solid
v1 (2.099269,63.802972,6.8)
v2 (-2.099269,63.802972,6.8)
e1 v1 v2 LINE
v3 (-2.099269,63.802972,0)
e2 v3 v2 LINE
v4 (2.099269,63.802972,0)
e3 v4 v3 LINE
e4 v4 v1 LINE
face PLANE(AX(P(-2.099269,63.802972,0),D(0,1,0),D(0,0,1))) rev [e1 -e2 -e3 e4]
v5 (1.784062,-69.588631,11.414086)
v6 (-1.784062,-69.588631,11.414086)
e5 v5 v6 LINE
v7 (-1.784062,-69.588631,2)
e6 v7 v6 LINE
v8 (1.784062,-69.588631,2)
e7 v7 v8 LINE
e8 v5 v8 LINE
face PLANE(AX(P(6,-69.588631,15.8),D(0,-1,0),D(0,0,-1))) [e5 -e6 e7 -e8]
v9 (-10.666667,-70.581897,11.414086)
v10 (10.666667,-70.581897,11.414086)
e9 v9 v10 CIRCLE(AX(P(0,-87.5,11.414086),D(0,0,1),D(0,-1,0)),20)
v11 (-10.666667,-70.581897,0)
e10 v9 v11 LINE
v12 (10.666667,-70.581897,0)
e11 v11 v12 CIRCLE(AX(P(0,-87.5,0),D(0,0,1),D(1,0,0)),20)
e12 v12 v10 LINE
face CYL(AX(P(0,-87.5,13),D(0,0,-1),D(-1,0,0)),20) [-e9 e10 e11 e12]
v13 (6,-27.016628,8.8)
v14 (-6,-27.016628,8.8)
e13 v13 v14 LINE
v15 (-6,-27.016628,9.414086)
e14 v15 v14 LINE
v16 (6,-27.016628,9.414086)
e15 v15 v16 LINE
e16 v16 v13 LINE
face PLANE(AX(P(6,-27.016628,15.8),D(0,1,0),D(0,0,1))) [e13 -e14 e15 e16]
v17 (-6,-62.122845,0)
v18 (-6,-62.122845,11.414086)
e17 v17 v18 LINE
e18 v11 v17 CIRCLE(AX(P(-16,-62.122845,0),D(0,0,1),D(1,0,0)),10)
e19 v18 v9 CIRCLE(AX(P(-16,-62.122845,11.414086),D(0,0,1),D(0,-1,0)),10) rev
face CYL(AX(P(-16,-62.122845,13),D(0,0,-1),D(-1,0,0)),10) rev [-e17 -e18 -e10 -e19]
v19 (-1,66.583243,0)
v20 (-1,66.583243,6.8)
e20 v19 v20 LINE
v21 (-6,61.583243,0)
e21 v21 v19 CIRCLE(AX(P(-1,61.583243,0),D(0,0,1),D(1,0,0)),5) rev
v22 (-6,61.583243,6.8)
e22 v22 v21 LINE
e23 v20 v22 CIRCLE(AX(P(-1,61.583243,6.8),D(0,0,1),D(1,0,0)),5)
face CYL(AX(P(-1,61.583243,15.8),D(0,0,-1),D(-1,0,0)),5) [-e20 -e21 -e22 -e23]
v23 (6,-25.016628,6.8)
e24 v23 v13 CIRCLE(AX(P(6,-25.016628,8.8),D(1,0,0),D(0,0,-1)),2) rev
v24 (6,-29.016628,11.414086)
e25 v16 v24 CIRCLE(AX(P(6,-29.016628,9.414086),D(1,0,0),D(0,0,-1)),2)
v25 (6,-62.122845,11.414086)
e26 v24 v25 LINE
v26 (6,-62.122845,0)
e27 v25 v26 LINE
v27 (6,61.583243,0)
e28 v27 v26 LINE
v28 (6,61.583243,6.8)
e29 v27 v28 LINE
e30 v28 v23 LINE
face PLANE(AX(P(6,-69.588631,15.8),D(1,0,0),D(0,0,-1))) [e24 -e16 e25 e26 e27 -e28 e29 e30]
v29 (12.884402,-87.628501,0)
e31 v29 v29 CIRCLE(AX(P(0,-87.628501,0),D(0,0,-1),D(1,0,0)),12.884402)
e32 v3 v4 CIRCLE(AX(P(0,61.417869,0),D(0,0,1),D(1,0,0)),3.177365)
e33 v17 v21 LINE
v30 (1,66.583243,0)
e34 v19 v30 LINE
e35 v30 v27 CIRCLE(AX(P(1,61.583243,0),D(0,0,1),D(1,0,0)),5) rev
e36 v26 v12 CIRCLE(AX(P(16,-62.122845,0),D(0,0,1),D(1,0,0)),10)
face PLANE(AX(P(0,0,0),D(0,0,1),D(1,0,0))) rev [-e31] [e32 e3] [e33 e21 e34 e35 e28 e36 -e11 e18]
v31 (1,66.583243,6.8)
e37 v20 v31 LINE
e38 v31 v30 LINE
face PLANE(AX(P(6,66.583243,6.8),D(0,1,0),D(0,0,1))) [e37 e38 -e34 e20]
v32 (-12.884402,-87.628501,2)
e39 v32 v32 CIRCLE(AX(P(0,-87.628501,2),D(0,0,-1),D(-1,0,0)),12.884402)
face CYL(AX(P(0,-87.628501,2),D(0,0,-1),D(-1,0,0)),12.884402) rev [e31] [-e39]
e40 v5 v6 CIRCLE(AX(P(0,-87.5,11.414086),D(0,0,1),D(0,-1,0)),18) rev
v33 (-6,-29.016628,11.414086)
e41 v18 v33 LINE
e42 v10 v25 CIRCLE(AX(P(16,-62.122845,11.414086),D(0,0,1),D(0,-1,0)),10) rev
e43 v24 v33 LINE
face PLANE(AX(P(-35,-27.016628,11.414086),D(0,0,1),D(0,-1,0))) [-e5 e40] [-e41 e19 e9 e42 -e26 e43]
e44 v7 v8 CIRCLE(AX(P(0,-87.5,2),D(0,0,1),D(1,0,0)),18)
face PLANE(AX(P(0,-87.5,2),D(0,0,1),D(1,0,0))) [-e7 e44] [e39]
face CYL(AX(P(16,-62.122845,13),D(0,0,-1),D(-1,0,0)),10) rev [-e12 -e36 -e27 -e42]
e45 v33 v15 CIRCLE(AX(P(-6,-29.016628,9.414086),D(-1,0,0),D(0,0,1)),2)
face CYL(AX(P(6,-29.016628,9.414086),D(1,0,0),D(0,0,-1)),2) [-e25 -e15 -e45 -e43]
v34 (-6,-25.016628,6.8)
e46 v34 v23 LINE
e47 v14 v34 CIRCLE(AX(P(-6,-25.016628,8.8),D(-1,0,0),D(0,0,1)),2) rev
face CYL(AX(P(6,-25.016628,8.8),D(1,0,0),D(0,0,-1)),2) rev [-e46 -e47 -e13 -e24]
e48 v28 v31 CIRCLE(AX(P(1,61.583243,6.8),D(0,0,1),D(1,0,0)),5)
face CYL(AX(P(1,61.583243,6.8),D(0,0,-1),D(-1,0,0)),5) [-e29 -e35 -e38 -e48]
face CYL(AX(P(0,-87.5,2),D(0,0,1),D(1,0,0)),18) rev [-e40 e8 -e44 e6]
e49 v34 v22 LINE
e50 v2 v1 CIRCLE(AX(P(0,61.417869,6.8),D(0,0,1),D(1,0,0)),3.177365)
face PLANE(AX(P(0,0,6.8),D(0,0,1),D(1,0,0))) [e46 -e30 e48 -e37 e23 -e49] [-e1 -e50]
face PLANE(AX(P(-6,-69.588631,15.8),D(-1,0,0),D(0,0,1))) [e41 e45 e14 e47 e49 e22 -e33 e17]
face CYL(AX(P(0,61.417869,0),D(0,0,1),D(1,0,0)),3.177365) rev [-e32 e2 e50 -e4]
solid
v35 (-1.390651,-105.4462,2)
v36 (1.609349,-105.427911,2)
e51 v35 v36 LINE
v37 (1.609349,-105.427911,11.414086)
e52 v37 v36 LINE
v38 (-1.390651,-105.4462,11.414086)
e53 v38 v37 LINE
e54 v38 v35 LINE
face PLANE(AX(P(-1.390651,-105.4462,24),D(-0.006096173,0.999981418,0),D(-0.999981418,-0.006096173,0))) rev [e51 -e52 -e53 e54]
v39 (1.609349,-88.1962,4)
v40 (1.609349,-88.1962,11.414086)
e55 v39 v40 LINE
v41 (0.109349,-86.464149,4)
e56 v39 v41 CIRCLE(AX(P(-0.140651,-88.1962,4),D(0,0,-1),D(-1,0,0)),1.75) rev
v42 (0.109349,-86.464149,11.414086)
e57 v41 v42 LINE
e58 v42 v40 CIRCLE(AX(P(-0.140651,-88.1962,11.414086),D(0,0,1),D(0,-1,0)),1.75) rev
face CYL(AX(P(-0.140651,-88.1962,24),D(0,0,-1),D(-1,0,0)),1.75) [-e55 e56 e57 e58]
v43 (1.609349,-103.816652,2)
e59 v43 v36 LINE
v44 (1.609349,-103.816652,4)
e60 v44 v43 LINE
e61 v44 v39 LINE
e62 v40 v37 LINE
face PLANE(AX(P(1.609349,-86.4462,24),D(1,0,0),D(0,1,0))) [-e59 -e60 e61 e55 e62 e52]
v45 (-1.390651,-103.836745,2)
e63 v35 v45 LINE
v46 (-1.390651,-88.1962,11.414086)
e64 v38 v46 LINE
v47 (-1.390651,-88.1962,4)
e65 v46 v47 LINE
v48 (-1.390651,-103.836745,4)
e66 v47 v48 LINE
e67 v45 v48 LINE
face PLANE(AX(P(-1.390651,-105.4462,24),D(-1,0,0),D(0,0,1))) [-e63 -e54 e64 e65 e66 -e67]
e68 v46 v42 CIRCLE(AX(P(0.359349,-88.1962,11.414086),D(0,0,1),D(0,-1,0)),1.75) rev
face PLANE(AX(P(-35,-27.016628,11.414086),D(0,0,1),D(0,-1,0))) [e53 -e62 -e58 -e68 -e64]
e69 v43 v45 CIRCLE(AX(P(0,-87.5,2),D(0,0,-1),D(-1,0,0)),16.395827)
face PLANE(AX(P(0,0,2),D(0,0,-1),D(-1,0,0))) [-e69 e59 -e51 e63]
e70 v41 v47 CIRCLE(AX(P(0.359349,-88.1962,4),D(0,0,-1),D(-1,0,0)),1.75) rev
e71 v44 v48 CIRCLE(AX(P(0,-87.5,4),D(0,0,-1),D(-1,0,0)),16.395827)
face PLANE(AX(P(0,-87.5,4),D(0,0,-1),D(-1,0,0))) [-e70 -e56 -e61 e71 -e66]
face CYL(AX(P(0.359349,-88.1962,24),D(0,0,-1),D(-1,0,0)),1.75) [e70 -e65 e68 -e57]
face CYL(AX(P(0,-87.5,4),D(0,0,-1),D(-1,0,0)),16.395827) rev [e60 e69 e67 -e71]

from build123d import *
from build123d.topology import SkipClean

# Parameters (mm, degrees)
BOSS_EXTRUDE1_DEPTH      = 13
BOSS_EXTRUDE1_2_DEPTH    = 13
BOSS_EXTRUDE2_DEPTH      = 13
CUT_EXTRUDE1_DEPTH       = 13
SKETCH3_W                = 6.626848164
SKETCH3_H                = 19.420298156
CUT_EXTRUDE2_DEPTH       = 13
FILLET1_R                = 10
SKETCH4_R                = 20
BOSS_EXTRUDE3_DEPTH      = 13
CUT_EXTRUDE3_DEPTH       = 13
SKETCH6_R                = 18
CUT_EXTRUDE4_DEPTH       = 24
BOSS_EXTRUDE7_DEPTH      = 22
FILLET5_R                = 1.75
FILLET6_R                = 20
SKETCH13_W               = 6.626848164
SKETCH13_H               = 84.326545424
CUT_EXTRUDE8_DEPTH       = 22
FILLET8_R                = 21.5
FILLET9_R                = 21.5
SKETCH14_W               = 17.060891399
SKETCH14_H               = 46.716771418
CUT_EXTRUDE10_DEPTH      = 22
SKETCH23_R               = 16.395826628
CUT_EXTRUDE14_DEPTH      = 4
BOSS_EXTRUDE16_DEPTH     = 2
SKETCH25_R               = 20.128500803
CUT_EXTRUDE15_DEPTH      = 9
SKETCH26_W               = 8.848519257
SKETCH26_H               = 26
CUT_EXTRUDE16_DEPTH      = 9
CUT_EXTRUDE17_DEPTH      = 9
FILLET21_R               = 3.5
SKETCH28_W               = 12
SKETCH28_H               = 42.572003563
BOSS_EXTRUDE20_DEPTH     = 15.8
BOSS_EXTRUDE21_START     = -6.8
SKETCH30_W               = 12
SKETCH30_H               = 93.599870645
BOSS_EXTRUDE21_DEPTH     = 6.8
FILLET23_R               = 5
BOSS_EXTRUDE22_DEPTH     = 6.8
CUT_EXTRUDE18_DEPTH      = 29
CUT_EXTRUDE18_DEPTH_BACK = 41
SKETCH34_W               = 5.585914081
SKETCH34_H               = 80.48337208
FILLET27_R               = 2
FILLET28_R               = 10


with BuildPart() as part:
    # Sketch1 → Boss-Extrude1 (new body)
    with BuildSketch(Plane.XY):
        with BuildLine():
            Line((4, -87.5), (-4, -87.5))
            Line((-4, -87.5), (-4, -67.904082058))
            ThreePointArc((-4, -67.904082058), (0, -107.5), (4, -67.904082058))
            Line((4, -67.904082058), (4, -87.5))
        make_face()
    extrude(amount=BOSS_EXTRUDE1_DEPTH)



with BuildPart() as body_2:
    # Sketch1 → Boss-Extrude1 2 (new body)
    with BuildSketch(Plane.XY):
        with BuildLine():
            Line((-4, 87.5), (-4, -67.904082058))
            ThreePointArc((-4, -67.904082058), (0, -67.5), (4, -67.904082058))
            Line((4, -67.904082058), (4, 87.5))
            ThreePointArc((4, 87.5), (0, 91.5), (-4, 87.5))
        make_face()
    extrude(amount=BOSS_EXTRUDE1_2_DEPTH)


with BuildPart() as part_1:
    add(part.part)

    add(body_2.part)  # Boss-Extrude2 merges body 2
    # Sketch1<3> → Boss-Extrude2 (add)
    with BuildSketch(Plane.XY):
        with BuildLine():
            Line((-4, -67.904082058), (-4, -87.5))
            Line((-4, -87.5), (4, -87.5))
            Line((4, -87.5), (4, -67.904082058))
            ThreePointArc((4, -67.904082058), (0, -67.5), (-4, -67.904082058))
        make_face()
        with BuildLine():
            Line((4, -87.5), (-4, -87.5))
            Line((-4, -87.5), (-4, -67.904082058))
            ThreePointArc((-4, -67.904082058), (-12.649110641, -102.991933385), (20, -87.5))
            ThreePointArc((20, -87.5), (15.491933385, -74.850889359), (4, -67.904082058))
            Line((4, -67.904082058), (4, -87.5))
        make_face()
    extrude(amount=BOSS_EXTRUDE2_DEPTH)

    # Sketch2 → Cut-Extrude1 (cut)
    with BuildSketch(Plane.XY.offset(13)):
        with BuildLine():
            Line((1.836704547, 90.02826846), (-1.836704547, 90.02826846))
            ThreePointArc((-1.836704547, 90.02826846), (-1.418788795, 84.715639507), (3.125, 87.5))
            ThreePointArc((3.125, 87.5), (2.784360493, 88.918788795), (1.836704547, 90.02826846))
        make_face()
    extrude(amount=-CUT_EXTRUDE1_DEPTH, mode=Mode.SUBTRACT)

    # Sketch3 → Cut-Extrude2 (cut)
    with BuildSketch(Plane(origin=(4, 0, 0), x_dir=(0, 0, -1), z_dir=(1, 0, 0))):
        with Locations((-9.686575918, 81.789850922)):
            Rectangle(SKETCH3_W, SKETCH3_H)
    extrude(amount=-CUT_EXTRUDE2_DEPTH, mode=Mode.SUBTRACT)

    # Fillet1
    # the kernel refuses this fillet: 10 mm, written as the material it adds along each edge
    with BuildSketch(Plane(origin=(4, 72.079701844, 6.373151836), x_dir=(0, 1, 0), z_dir=(-1, 0, 0))) as fillet1_piece_1:
        with BuildLine():
            CenterArc((9.413917712, -10), FILLET1_R, 90, 70.286615286)
            Line((0, -6.626848164), (-0.188278354, -6.559385127))
            ThreePointArc((-0.188278354, -6.559385127), (-0.2, -3.313424082), (-0.2, 0))
            Line((-0.2, 0), (0, 0.2))
            Line((0, 0.2), (9.413917712, 0.2))
            Line((9.413917712, 0.2), (9.413917712, 0))
        make_face()
    extrude(amount=8)

    # Sketch4 → Boss-Extrude3 (add)
    with BuildSketch(Plane.XY.offset(13)):
        with Locations(Location((0, -87.5, 0), (0, 0, 101.536959033))):
            Circle(SKETCH4_R)
    extrude(amount=BOSS_EXTRUDE3_DEPTH)

    # Sketch5 → Cut-Extrude3 (cut)
    with BuildSketch(Plane(origin=(4, 0, 0), x_dir=(0, 0, -1), z_dir=(1, 0, 0))):
        with BuildLine():
            Line((-13, 61.057159029), (-13, 87.5))
            Line((-13, 87.5), (-6.373151836, 87.5))
            ThreePointArc((-6.373151836, 87.5), (-7.529351989, 73.73795699), (-13, 61.057159029))
        make_face()
    extrude(amount=-CUT_EXTRUDE3_DEPTH, mode=Mode.SUBTRACT)

    # Sketch6 → Cut-Extrude4 (cut)
    with BuildSketch(Plane.XY.offset(26)):
        with Locations((0, -87.5)):
            Circle(SKETCH6_R)
    extrude(amount=-CUT_EXTRUDE4_DEPTH, mode=Mode.SUBTRACT)

    # Fillet6
    fillet6_edges = [part_1.edges().sort_by_distance(p)[0] for p in [
        (0, 61.057159029, 13),
    ]]
    fillet(fillet6_edges, radius=FILLET6_R)

    # Sketch13 → Cut-Extrude8 (cut)
    with BuildSketch(Plane.ZY.offset(4)):
        with Locations((9.686575918, 45.336727288)):
            Rectangle(SKETCH13_W, SKETCH13_H)
    extrude(amount=-CUT_EXTRUDE8_DEPTH, mode=Mode.SUBTRACT)

    # Fillet8
    # the kernel refuses this fillet: 21.5 mm, written as the material it adds along each edge
    with BuildSketch(Plane(origin=(-4, 3.173454576, 6.373151836), x_dir=(0, 1, 0), z_dir=(1, 0, 0))) as fillet8_piece_1:
        with BuildLine():
            CenterArc((15.525442166, 21.5), FILLET8_R, 223.770740898, 46.229259102)
            Line((0, 6.626848164), (-0.310508843, 6.329385127))
            ThreePointArc((-0.310508843, 6.329385127), (-0.43, 3.313424082), (-0.43, 0))
            Line((-0.43, 0), (0, -0.43))
            Line((0, -0.43), (15.525442166, -0.43))
            Line((15.525442166, -0.43), (15.525442166, 0))
        make_face()
    extrude(amount=8)

    # Fillet9
    fillet9_edges = [part_1.edges().sort_by_distance(p)[0] for p in [
        (0, 3.173454576, 13),
    ]]
    fillet(fillet9_edges, radius=FILLET9_R)

    # Sketch14 → Cut-Extrude10 (cut)
    with BuildSketch(Plane.ZY.offset(4)):
        with Locations((14.903597536, -4.659488967)):
            Rectangle(SKETCH14_W, SKETCH14_H)
    extrude(amount=-CUT_EXTRUDE10_DEPTH, mode=Mode.SUBTRACT)


with BuildPart() as body_2_2:
    # Sketch8 → Boss-Extrude7 (new body)
    with BuildSketch(Plane.XY.offset(2)):
        Polygon((-1.390650573, -105.446199904), (-1.390650573, -86.446199904), (1.609349427, -86.446199904), (1.609349427, -105.427911045), align=None)
    extrude(amount=BOSS_EXTRUDE7_DEPTH)

    # Fillet5
    # the kernel refuses this fillet: 1.75 mm, written as the material it takes off along each edge
    with BuildSketch(Plane(origin=(1.609349427, -86.446199904, -2.375), x_dir=(-1, 0, 0), z_dir=(0, 0, 1)), Plane(origin=(-1.390650573, -86.446199904, -2.375), x_dir=(0, -1, 0), z_dir=(0, 0, 1))) as fillet5_piece_1:
        with BuildLine():
            CenterArc((FILLET5_R, FILLET5_R), FILLET5_R, 180, 90)
            Line((0, FILLET5_R), (0, 0))
            Line((0, 0), (FILLET5_R, 0))
        make_face()
    extrude(amount=30.75, mode=Mode.SUBTRACT)


with BuildPart() as cut_extrude14_tool:
    # Sketch23 → Cut-Extrude14 (new body)
    with BuildSketch(Plane(origin=(0, 0, 0), x_dir=(-1, 0, 0), z_dir=(0, 0, -1))):
        with Locations((0, -87.5)):
            Circle(SKETCH23_R)
    extrude(amount=-CUT_EXTRUDE14_DEPTH)


with BuildPart() as part_2:
    add(part_1.part)

    # Cut-Extrude14: cut by cut_extrude14_tool
    add(cut_extrude14_tool.part, mode=Mode.SUBTRACT)

    # Sketch24 → Boss-Extrude16 (add)
    with BuildSketch(Plane(origin=(0, 0, 0), x_dir=(-1, 0, 0), z_dir=(0, 0, -1))):
        with BuildLine():
            ThreePointArc((0, -71.104173372), (-16.395826628, -87.5), (0, -103.895826628))
            ThreePointArc((0, -103.895826628), (16.395826628, -87.5), (0, -71.104173372))
        make_face()
        with BuildLine():
            ThreePointArc((0, -74.744099259), (12.884401545, -87.628500803), (0, -100.512902348))
            ThreePointArc((0, -100.512902348), (-12.884401545, -87.628500803), (0, -74.744099259))
        make_face(mode=Mode.SUBTRACT)
    extrude(amount=-BOSS_EXTRUDE16_DEPTH)


with BuildPart() as body_2_2_1:
    add(body_2_2.part)

    # Cut-Extrude14: cut by cut_extrude14_tool
    add(cut_extrude14_tool.part, mode=Mode.SUBTRACT)


with BuildPart() as cut_extrude15_tool:
    # Sketch25 → Cut-Extrude15 (new body)
    with BuildSketch(Plane.XY.offset(26)):
        with Locations((0, -87.628500803)):
            Circle(SKETCH25_R)
    extrude(amount=-CUT_EXTRUDE15_DEPTH)


with BuildPart() as part_3:
    add(part_2.part)

    # Cut-Extrude15: cut by cut_extrude15_tool
    add(cut_extrude15_tool.part, mode=Mode.SUBTRACT)

    # Sketch26 → Cut-Extrude16 (cut)
    with BuildSketch(Plane.XY.offset(6.373151836)):
        with Locations((0.424259629, 79.373396417)):
            Rectangle(SKETCH26_W, SKETCH26_H)
    extrude(amount=-CUT_EXTRUDE16_DEPTH, mode=Mode.SUBTRACT)

    # Sketch27 → Cut-Extrude17 (cut)
    with BuildSketch(Plane.XY.offset(6.373151836)):
        with BuildLine():
            Line((2.132304127, 63.840504789), (-2.132304127, 63.840504789))
            ThreePointArc((-2.132304127, 63.840504789), (-1.329315567, 58.476984755), (3.22736468, 61.417869469))
            ThreePointArc((3.22736468, 61.417869469), (2.940884714, 62.747185037), (2.132304127, 63.840504789))
        make_face()
    extrude(amount=-CUT_EXTRUDE17_DEPTH, mode=Mode.SUBTRACT)

    # Fillet21
    fillet21_edges = [part_3.edges().sort_by_distance(p)[0] for p in [
        (4, 66.373396417, 3.186575918),
        (-4, 66.373396417, 3.186575918),
    ]]
    fillet(fillet21_edges, radius=FILLET21_R)

    # Sketch28 → Boss-Extrude20 (add)
    with BuildSketch(Plane(origin=(0, 0, 0), x_dir=(-1, 0, 0), z_dir=(0, 0, -1))):
        with Locations((0, -48.302629702)):
            Rectangle(SKETCH28_W, SKETCH28_H)
    extrude(amount=-BOSS_EXTRUDE20_DEPTH)

    # Sketch30 → Boss-Extrude21 (add)
    with SkipClean():  # the faces are left unmerged after this step: merging them gives an invalid solid
        with BuildSketch(Plane(origin=(0, 0, 0), x_dir=(-1, 0, 0), z_dir=(0, 0, -1)).offset(BOSS_EXTRUDE21_START)):
            with Locations((0, 19.783307403)):
                Rectangle(SKETCH30_W, SKETCH30_H)
            with BuildLine():
                Line((2.132304127, 63.840504789), (-2.132304127, 63.840504789))
                ThreePointArc((-2.132304127, 63.840504789), (0, 58.190504789), (2.132304127, 63.840504789))
            make_face(mode=Mode.SUBTRACT)
        extrude(amount=BOSS_EXTRUDE21_DEPTH)

    # Fillet23
    fillet23_edges = [part_3.edges().sort_by_distance(p)[0] for p in [
        (6, 66.583242725, 3.4),
        (-6, 66.583242725, 3.4),
    ]]
    fillet(fillet23_edges, radius=FILLET23_R)

    # Sketch33 → Boss-Extrude22 (add)
    with BuildSketch(Plane.XY.offset(6.8)):
        with BuildLine():
            Line((-2.132304127, 63.840504789), (2.132304127, 63.840504789))
            ThreePointArc((2.132304127, 63.840504789), (0, 58.190504789), (-2.132304127, 63.840504789))
        make_face()
        with BuildLine():
            Line((-2.09926937, 63.802972072), (2.09926937, 63.802972072))
            ThreePointArc((2.09926937, 63.802972072), (0, 58.240504789), (-2.09926937, 63.802972072))
        make_face(mode=Mode.SUBTRACT)
    extrude(amount=-BOSS_EXTRUDE22_DEPTH)


with BuildPart() as body_2_2_2:
    add(body_2_2_1.part)

    # Cut-Extrude15: cut by cut_extrude15_tool
    add(cut_extrude15_tool.part, mode=Mode.SUBTRACT)


with BuildPart() as cut_extrude18_tool:
    # Sketch34 → Cut-Extrude18 (new, two sides: drawn at the far end of the back side and taken through both)
    with BuildSketch(Plane.ZY.offset(6).offset(-CUT_EXTRUDE18_DEPTH_BACK)):
        with Locations((14.20704296, -67.25831396)):
            Rectangle(SKETCH34_W, SKETCH34_H)
    extrude(amount=CUT_EXTRUDE18_DEPTH + CUT_EXTRUDE18_DEPTH_BACK)


with BuildPart() as part_4:
    add(part_3.part)

    # Cut-Extrude18: cut by cut_extrude18_tool
    add(cut_extrude18_tool.part, mode=Mode.SUBTRACT)

    # Fillet27
    fillet27_edges = [part_4.edges().sort_by_distance(p)[0] for p in [
        (0, -27.01662792, 6.8),
        (0, -27.01662792, 11.414085919),
    ]]
    fillet(fillet27_edges, radius=FILLET27_R)

    # Fillet28
    fillet28_edges = [part_4.edges().sort_by_distance(p)[0] for p in [
        (6, -68.421215972, 5.707042959),
        (-6, -68.421215972, 5.707042959),
    ]]
    fillet(fillet28_edges, radius=FILLET28_R)


with BuildPart() as body_2_2_3:
    add(body_2_2_2.part)

    # Cut-Extrude18: cut by cut_extrude18_tool
    add(cut_extrude18_tool.part, mode=Mode.SUBTRACT)


solid = Compound([part_4.part, body_2_2_3.part])
